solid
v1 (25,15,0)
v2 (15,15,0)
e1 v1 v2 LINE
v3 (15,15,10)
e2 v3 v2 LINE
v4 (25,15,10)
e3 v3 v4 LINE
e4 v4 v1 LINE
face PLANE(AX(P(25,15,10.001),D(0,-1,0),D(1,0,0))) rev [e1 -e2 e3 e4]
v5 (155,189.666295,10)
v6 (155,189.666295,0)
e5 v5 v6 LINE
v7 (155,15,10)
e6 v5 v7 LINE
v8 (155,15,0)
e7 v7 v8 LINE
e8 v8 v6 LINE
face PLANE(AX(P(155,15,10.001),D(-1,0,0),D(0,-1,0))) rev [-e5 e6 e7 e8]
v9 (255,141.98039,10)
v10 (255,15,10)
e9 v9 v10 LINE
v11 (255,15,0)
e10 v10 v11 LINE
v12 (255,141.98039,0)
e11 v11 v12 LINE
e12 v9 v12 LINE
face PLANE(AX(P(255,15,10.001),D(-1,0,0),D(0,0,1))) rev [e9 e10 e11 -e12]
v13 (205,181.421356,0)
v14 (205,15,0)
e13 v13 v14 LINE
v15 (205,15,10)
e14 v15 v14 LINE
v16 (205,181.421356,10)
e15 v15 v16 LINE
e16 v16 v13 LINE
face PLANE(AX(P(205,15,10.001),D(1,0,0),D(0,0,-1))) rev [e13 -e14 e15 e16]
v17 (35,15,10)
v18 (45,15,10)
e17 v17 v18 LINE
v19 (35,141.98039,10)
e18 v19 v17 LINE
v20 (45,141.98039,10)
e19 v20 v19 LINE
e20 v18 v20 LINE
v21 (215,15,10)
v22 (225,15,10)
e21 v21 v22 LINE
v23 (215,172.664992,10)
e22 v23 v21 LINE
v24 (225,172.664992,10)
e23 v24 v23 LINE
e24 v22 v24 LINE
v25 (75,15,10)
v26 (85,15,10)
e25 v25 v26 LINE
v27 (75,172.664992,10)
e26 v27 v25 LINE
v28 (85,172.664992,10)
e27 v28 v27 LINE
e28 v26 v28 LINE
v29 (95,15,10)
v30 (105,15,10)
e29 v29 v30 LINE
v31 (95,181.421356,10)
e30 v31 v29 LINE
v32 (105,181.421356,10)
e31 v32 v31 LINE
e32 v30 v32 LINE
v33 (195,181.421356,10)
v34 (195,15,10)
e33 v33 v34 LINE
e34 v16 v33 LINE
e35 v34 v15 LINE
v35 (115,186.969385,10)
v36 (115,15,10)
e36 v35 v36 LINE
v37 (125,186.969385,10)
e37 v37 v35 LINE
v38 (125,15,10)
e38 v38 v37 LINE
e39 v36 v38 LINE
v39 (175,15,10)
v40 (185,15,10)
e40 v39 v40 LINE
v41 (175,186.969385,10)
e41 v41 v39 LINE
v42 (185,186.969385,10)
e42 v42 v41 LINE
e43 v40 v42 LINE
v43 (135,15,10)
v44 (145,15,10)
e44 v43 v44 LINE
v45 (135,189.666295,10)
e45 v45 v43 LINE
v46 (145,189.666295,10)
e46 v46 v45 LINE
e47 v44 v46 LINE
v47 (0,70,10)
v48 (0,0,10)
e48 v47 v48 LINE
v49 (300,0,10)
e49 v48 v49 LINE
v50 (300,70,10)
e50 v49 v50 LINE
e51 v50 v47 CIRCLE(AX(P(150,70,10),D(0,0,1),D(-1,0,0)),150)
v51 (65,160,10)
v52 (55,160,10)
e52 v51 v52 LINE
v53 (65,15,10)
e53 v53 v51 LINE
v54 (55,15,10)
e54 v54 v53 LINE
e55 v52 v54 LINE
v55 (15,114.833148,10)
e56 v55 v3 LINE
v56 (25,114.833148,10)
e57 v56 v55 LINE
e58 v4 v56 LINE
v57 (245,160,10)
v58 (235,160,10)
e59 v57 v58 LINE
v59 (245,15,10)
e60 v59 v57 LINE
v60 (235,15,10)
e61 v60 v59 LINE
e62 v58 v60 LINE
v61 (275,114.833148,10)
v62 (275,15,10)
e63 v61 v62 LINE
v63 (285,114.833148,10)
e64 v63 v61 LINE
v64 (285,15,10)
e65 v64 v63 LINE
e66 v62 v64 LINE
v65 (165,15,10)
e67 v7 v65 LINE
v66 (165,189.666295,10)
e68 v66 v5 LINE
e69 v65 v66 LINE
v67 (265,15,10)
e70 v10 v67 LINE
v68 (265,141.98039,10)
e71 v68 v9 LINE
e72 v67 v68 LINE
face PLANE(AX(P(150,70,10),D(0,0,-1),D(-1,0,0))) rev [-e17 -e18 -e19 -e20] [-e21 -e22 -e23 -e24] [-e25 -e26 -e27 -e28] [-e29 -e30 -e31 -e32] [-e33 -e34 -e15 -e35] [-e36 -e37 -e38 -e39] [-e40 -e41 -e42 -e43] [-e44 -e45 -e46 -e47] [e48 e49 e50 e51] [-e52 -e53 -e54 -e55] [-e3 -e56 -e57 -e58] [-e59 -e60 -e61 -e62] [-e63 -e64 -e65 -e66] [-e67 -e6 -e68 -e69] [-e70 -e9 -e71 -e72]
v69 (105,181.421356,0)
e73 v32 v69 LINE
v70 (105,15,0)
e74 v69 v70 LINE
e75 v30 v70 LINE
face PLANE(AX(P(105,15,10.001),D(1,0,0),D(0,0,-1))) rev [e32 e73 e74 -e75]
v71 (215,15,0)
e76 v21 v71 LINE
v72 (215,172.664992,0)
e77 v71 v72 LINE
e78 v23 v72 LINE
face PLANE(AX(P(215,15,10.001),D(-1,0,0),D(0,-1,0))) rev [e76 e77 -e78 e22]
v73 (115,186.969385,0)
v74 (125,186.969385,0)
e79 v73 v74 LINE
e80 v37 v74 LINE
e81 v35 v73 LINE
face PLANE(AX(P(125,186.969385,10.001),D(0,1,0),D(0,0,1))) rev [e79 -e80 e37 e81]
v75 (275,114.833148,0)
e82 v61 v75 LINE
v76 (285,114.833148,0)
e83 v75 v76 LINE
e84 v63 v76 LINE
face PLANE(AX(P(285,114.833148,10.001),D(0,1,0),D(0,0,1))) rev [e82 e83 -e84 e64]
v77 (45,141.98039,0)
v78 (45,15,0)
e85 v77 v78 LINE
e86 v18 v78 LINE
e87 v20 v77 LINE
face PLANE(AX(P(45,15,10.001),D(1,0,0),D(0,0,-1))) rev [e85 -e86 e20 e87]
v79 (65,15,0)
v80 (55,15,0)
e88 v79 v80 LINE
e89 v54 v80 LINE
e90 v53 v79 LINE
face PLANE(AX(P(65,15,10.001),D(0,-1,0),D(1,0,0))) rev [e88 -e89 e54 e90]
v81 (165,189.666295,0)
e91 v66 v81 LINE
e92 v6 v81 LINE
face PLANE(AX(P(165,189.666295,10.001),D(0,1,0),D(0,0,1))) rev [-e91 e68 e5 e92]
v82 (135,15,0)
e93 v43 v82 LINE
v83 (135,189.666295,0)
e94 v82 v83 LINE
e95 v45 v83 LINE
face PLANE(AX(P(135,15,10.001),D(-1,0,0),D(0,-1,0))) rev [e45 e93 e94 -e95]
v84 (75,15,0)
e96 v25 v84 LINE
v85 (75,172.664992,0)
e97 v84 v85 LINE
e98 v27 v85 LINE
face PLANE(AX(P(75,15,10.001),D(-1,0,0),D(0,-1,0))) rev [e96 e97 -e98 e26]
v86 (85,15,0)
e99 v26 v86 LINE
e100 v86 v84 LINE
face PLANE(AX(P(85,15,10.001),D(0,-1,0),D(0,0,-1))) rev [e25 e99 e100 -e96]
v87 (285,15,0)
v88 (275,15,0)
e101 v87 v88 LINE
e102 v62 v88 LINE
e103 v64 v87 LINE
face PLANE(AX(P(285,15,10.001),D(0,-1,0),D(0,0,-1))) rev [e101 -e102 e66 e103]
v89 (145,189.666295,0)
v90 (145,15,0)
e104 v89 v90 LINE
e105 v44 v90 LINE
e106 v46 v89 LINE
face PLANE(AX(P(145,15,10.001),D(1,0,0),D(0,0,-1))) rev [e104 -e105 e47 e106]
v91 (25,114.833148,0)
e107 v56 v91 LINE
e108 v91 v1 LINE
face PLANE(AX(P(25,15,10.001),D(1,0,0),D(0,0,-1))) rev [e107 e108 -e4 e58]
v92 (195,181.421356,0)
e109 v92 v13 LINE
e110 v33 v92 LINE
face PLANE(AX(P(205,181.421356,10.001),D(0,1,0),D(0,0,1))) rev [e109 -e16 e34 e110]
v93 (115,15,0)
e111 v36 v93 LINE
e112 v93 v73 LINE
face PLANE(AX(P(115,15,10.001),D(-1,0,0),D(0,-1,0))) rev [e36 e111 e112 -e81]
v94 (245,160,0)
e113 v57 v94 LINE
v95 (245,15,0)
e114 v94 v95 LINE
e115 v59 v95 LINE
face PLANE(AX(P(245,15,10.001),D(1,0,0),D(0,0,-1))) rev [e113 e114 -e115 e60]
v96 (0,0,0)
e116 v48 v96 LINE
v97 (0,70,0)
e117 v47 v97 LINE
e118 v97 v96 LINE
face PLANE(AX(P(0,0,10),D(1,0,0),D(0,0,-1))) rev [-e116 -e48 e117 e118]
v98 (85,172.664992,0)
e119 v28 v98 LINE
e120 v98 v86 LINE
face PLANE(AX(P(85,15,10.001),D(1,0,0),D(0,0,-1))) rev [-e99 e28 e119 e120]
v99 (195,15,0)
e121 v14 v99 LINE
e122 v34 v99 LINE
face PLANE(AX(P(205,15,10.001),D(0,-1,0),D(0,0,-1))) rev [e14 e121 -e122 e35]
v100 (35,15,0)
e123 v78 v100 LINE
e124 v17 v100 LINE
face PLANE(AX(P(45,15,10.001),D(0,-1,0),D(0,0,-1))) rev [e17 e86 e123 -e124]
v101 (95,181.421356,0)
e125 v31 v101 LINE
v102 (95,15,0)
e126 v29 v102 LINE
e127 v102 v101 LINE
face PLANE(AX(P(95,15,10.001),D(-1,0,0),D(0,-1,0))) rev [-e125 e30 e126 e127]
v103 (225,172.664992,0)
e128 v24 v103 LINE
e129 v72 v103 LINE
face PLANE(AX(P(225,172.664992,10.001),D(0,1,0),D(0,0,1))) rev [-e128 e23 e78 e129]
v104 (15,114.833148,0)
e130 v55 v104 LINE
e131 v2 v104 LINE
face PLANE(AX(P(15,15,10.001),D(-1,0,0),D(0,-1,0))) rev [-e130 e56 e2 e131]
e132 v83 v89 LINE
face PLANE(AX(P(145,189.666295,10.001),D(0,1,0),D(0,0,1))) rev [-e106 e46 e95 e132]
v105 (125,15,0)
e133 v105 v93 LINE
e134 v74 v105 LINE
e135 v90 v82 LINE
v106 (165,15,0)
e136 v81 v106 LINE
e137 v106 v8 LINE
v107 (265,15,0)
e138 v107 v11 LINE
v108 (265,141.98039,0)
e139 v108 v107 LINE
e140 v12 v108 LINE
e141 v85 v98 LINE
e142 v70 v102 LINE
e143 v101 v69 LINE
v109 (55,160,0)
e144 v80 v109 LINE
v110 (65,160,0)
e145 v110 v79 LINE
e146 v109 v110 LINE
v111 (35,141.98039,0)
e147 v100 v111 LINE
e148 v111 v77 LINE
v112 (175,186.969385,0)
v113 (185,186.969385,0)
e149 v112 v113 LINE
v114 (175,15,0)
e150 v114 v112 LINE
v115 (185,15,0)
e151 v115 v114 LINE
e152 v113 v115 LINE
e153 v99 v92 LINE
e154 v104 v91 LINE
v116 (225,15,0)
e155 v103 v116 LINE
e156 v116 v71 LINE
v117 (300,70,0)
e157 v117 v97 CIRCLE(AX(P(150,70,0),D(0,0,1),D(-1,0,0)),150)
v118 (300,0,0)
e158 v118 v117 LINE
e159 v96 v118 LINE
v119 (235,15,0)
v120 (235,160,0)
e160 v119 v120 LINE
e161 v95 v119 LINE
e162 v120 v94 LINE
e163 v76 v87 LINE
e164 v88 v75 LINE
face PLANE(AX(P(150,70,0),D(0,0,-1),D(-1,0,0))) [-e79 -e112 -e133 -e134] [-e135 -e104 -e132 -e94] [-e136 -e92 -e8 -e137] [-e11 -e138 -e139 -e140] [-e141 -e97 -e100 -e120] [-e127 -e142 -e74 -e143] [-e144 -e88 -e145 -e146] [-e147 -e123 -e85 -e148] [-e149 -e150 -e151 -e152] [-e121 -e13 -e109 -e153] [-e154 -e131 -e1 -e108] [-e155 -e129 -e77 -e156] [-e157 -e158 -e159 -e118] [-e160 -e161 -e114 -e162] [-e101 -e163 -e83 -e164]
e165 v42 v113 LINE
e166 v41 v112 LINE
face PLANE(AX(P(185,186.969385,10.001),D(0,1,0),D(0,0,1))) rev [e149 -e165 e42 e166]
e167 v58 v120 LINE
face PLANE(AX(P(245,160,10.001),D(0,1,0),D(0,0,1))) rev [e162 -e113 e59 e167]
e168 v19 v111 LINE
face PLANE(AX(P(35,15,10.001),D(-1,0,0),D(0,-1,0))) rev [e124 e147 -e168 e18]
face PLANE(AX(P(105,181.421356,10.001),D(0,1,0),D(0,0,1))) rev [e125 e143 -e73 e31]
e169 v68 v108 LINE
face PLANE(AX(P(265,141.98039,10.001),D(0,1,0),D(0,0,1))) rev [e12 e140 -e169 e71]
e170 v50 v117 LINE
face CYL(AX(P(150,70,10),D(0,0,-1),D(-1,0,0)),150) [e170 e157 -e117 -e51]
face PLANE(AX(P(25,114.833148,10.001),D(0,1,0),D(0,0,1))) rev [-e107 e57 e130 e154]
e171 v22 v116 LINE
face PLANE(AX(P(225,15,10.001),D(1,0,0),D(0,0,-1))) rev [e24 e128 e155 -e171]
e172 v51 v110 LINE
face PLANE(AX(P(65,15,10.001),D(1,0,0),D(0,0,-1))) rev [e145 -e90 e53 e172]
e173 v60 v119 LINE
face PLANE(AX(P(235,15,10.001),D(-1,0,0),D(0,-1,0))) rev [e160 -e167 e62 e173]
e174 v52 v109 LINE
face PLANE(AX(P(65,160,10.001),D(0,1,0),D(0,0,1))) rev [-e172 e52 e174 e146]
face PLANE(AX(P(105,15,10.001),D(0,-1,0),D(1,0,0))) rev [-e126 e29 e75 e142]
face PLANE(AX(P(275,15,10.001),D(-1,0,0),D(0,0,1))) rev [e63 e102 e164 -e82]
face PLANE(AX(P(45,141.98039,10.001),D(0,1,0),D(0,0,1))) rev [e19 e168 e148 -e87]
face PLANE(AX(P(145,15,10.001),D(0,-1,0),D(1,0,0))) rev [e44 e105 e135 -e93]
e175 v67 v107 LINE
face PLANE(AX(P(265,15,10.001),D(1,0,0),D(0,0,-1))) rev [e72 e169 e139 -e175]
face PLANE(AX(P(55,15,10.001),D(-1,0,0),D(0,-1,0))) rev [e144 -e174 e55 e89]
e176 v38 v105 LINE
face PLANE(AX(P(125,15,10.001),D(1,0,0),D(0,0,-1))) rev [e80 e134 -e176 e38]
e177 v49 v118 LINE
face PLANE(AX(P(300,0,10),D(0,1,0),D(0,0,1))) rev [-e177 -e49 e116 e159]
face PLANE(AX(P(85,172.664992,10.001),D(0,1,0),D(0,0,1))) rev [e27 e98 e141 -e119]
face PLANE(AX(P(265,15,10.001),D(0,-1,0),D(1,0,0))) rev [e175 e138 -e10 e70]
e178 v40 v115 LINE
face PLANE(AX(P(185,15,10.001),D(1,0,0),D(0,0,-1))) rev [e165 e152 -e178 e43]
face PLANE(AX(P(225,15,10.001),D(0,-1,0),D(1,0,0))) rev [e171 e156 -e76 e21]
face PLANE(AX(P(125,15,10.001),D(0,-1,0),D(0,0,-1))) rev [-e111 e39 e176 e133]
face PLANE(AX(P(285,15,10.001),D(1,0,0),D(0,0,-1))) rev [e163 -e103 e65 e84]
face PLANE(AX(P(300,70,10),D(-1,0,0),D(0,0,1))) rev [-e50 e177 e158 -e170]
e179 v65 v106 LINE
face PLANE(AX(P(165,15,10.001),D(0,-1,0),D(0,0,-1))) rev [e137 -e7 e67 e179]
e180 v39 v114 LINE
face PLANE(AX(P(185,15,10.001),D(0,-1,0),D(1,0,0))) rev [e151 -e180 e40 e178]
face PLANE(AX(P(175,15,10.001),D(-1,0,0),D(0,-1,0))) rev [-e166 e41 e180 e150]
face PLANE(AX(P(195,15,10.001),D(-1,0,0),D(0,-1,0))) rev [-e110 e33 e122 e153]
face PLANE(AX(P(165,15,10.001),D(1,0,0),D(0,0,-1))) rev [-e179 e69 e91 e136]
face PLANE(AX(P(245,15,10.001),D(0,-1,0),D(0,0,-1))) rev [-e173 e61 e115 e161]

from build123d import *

# Parameters (mm, degrees)
P_IDAT_VYSUNUT_M1_DEPTH  = 10
ODEBRAT_VYSUNUT_M1_REACH = 374.156
SKICA2_W                 = 10
SKICA2_H                 = 99.833147735
LINPOLE2_START           = 15
LINPOLE2_OUTLINE_W       = 10
LINPOLE2_OUTLINE_H       = 10
LINPOLE2_DEPTH           = 126.980390272
LINPOLE2_START_2         = 141.980390272
LINPOLE2_2_OUTLINE_W     = 10
LINPOLE2_2_OUTLINE_H     = 10
LINPOLE2_2_DEPTH         = 30.684601342
LINPOLE2_3_OUTLINE_W     = 10
LINPOLE2_3_OUTLINE_H     = 10
LINPOLE2_3_DEPTH         = 99.833147735
LINPOLE2_START_3         = 172.664991614
LINPOLE2_4_OUTLINE_W     = 10
LINPOLE2_4_OUTLINE_H     = 10
LINPOLE2_4_DEPTH         = 14.304392953
LINPOLE2_5_OUTLINE_W     = 10
LINPOLE2_5_OUTLINE_H     = 10
LINPOLE2_5_DEPTH         = 18.019609728
LINPOLE2_6_OUTLINE_W     = 10
LINPOLE2_6_OUTLINE_H     = 10
LINPOLE2_6_DEPTH         = 8.756364623
LINPOLE2_START_4         = 186.969384567
LINPOLE2_7_OUTLINE_W     = 10
LINPOLE2_7_OUTLINE_H     = 10
LINPOLE2_7_DEPTH         = 2.696910904


# Read off the part's stored shape, not the designer's step: LinPole2
with BuildPart() as part:
    # Skica1 → Přidat vysunutím1 (new body)
    with BuildSketch(Plane.XY):
        with BuildLine():
            Line((0, 0), (0, 70))
            ThreePointArc((0, 70), (150, 220), (300, 70))
            Line((300, 70), (300, 0))
            Line((300, 0), (0, 0))
        make_face()
    extrude(amount=P_IDAT_VYSUNUT_M1_DEPTH)

    # Skica2 → Odebrat vysunutím1 (cut, up to next)
    with BuildSketch(Plane(origin=(0, 0, 0), x_dir=(-1, 0, 0), z_dir=(0, 0, -1)), mode=Mode.PRIVATE) as odebrat_vysunut_m1_sk1:
        with Locations((-280, 64.916573868)):
            Rectangle(SKICA2_W, SKICA2_H)
    odebrat_vysunut_m1_tool1 = extrude(odebrat_vysunut_m1_sk1.sketch, amount=-ODEBRAT_VYSUNUT_M1_REACH, mode=Mode.PRIVATE) & part.part
    add(odebrat_vysunut_m1_tool1.solids().sort_by_distance((280, 64.916574, 0))[0], mode=Mode.SUBTRACT)

    # LinPole2 outline → LinPole2 (cut)
    with BuildSketch(Plane(origin=(0, 0, 0), x_dir=(1, 0, 0), z_dir=(0, 1, 0)).offset(LINPOLE2_START)):
        with Locations((40, -5)):
            Rectangle(LINPOLE2_OUTLINE_W, LINPOLE2_OUTLINE_H)
        with Locations((60, -5)):
            Rectangle(LINPOLE2_OUTLINE_W, LINPOLE2_OUTLINE_H)
        with Locations((80, -5)):
            Rectangle(LINPOLE2_OUTLINE_W, LINPOLE2_OUTLINE_H)
        with Locations((100, -5)):
            Rectangle(LINPOLE2_OUTLINE_W, LINPOLE2_OUTLINE_H)
        with Locations((120, -5)):
            Rectangle(LINPOLE2_OUTLINE_W, LINPOLE2_OUTLINE_H)
        with Locations((140, -5)):
            Rectangle(LINPOLE2_OUTLINE_W, LINPOLE2_OUTLINE_H)
        with Locations((160, -5)):
            Rectangle(LINPOLE2_OUTLINE_W, LINPOLE2_OUTLINE_H)
        with Locations((180, -5)):
            Rectangle(LINPOLE2_OUTLINE_W, LINPOLE2_OUTLINE_H)
        with Locations((200, -5)):
            Rectangle(LINPOLE2_OUTLINE_W, LINPOLE2_OUTLINE_H)
        with Locations((220, -5)):
            Rectangle(LINPOLE2_OUTLINE_W, LINPOLE2_OUTLINE_H)
        with Locations((240, -5)):
            Rectangle(LINPOLE2_OUTLINE_W, LINPOLE2_OUTLINE_H)
        with Locations((260, -5)):
            Rectangle(LINPOLE2_OUTLINE_W, LINPOLE2_OUTLINE_H)
    extrude(amount=LINPOLE2_DEPTH, mode=Mode.SUBTRACT)

    # LinPole2 2 outline → LinPole2 2 (cut)
    with BuildSketch(Plane(origin=(0, 0, 0), x_dir=(1, 0, 0), z_dir=(0, 1, 0)).offset(LINPOLE2_START_2)):
        with Locations((80, -5)):
            Rectangle(LINPOLE2_2_OUTLINE_W, LINPOLE2_2_OUTLINE_H)
        with Locations((100, -5)):
            Rectangle(LINPOLE2_2_OUTLINE_W, LINPOLE2_2_OUTLINE_H)
        with Locations((120, -5)):
            Rectangle(LINPOLE2_2_OUTLINE_W, LINPOLE2_2_OUTLINE_H)
        with Locations((140, -5)):
            Rectangle(LINPOLE2_2_OUTLINE_W, LINPOLE2_2_OUTLINE_H)
        with Locations((160, -5)):
            Rectangle(LINPOLE2_2_OUTLINE_W, LINPOLE2_2_OUTLINE_H)
        with Locations((180, -5)):
            Rectangle(LINPOLE2_2_OUTLINE_W, LINPOLE2_2_OUTLINE_H)
        with Locations((200, -5)):
            Rectangle(LINPOLE2_2_OUTLINE_W, LINPOLE2_2_OUTLINE_H)
        with Locations((220, -5)):
            Rectangle(LINPOLE2_2_OUTLINE_W, LINPOLE2_2_OUTLINE_H)
    extrude(amount=LINPOLE2_2_DEPTH, mode=Mode.SUBTRACT)

    # LinPole2 3 outline → LinPole2 3 (cut)
    with BuildSketch(Plane(origin=(0, 0, 0), x_dir=(1, 0, 0), z_dir=(0, 1, 0)).offset(LINPOLE2_START)):
        with Locations((20, -5)):
            Rectangle(LINPOLE2_3_OUTLINE_W, LINPOLE2_3_OUTLINE_H)
    extrude(amount=LINPOLE2_3_DEPTH, mode=Mode.SUBTRACT)

    # LinPole2 4 outline → LinPole2 4 (cut)
    with BuildSketch(Plane(origin=(0, 0, 0), x_dir=(1, 0, 0), z_dir=(0, 1, 0)).offset(LINPOLE2_START_3)):
        with Locations((120, -5)):
            Rectangle(LINPOLE2_4_OUTLINE_W, LINPOLE2_4_OUTLINE_H)
        with Locations((140, -5)):
            Rectangle(LINPOLE2_4_OUTLINE_W, LINPOLE2_4_OUTLINE_H)
        with Locations((160, -5)):
            Rectangle(LINPOLE2_4_OUTLINE_W, LINPOLE2_4_OUTLINE_H)
        with Locations((180, -5)):
            Rectangle(LINPOLE2_4_OUTLINE_W, LINPOLE2_4_OUTLINE_H)
    extrude(amount=LINPOLE2_4_DEPTH, mode=Mode.SUBTRACT)

    # LinPole2 5 outline → LinPole2 5 (cut)
    with BuildSketch(Plane(origin=(0, 0, 0), x_dir=(1, 0, 0), z_dir=(0, 1, 0)).offset(LINPOLE2_START_2)):
        with Locations((60, -5)):
            Rectangle(LINPOLE2_5_OUTLINE_W, LINPOLE2_5_OUTLINE_H)
        with Locations((240, -5)):
            Rectangle(LINPOLE2_5_OUTLINE_W, LINPOLE2_5_OUTLINE_H)
    extrude(amount=LINPOLE2_5_DEPTH, mode=Mode.SUBTRACT)

    # LinPole2 6 outline → LinPole2 6 (cut)
    with BuildSketch(Plane(origin=(0, 0, 0), x_dir=(1, 0, 0), z_dir=(0, 1, 0)).offset(LINPOLE2_START_3)):
        with Locations((100, -5)):
            Rectangle(LINPOLE2_6_OUTLINE_W, LINPOLE2_6_OUTLINE_H)
        with Locations((200, -5)):
            Rectangle(LINPOLE2_6_OUTLINE_W, LINPOLE2_6_OUTLINE_H)
    extrude(amount=LINPOLE2_6_DEPTH, mode=Mode.SUBTRACT)

    # LinPole2 7 outline → LinPole2 7 (cut)
    with BuildSketch(Plane(origin=(0, 0, 0), x_dir=(1, 0, 0), z_dir=(0, 1, 0)).offset(LINPOLE2_START_4)):
        with Locations((140, -5)):
            Rectangle(LINPOLE2_7_OUTLINE_W, LINPOLE2_7_OUTLINE_H)
        with Locations((160, -5)):
            Rectangle(LINPOLE2_7_OUTLINE_W, LINPOLE2_7_OUTLINE_H)
    extrude(amount=LINPOLE2_7_DEPTH, mode=Mode.SUBTRACT)


solid = part.part
